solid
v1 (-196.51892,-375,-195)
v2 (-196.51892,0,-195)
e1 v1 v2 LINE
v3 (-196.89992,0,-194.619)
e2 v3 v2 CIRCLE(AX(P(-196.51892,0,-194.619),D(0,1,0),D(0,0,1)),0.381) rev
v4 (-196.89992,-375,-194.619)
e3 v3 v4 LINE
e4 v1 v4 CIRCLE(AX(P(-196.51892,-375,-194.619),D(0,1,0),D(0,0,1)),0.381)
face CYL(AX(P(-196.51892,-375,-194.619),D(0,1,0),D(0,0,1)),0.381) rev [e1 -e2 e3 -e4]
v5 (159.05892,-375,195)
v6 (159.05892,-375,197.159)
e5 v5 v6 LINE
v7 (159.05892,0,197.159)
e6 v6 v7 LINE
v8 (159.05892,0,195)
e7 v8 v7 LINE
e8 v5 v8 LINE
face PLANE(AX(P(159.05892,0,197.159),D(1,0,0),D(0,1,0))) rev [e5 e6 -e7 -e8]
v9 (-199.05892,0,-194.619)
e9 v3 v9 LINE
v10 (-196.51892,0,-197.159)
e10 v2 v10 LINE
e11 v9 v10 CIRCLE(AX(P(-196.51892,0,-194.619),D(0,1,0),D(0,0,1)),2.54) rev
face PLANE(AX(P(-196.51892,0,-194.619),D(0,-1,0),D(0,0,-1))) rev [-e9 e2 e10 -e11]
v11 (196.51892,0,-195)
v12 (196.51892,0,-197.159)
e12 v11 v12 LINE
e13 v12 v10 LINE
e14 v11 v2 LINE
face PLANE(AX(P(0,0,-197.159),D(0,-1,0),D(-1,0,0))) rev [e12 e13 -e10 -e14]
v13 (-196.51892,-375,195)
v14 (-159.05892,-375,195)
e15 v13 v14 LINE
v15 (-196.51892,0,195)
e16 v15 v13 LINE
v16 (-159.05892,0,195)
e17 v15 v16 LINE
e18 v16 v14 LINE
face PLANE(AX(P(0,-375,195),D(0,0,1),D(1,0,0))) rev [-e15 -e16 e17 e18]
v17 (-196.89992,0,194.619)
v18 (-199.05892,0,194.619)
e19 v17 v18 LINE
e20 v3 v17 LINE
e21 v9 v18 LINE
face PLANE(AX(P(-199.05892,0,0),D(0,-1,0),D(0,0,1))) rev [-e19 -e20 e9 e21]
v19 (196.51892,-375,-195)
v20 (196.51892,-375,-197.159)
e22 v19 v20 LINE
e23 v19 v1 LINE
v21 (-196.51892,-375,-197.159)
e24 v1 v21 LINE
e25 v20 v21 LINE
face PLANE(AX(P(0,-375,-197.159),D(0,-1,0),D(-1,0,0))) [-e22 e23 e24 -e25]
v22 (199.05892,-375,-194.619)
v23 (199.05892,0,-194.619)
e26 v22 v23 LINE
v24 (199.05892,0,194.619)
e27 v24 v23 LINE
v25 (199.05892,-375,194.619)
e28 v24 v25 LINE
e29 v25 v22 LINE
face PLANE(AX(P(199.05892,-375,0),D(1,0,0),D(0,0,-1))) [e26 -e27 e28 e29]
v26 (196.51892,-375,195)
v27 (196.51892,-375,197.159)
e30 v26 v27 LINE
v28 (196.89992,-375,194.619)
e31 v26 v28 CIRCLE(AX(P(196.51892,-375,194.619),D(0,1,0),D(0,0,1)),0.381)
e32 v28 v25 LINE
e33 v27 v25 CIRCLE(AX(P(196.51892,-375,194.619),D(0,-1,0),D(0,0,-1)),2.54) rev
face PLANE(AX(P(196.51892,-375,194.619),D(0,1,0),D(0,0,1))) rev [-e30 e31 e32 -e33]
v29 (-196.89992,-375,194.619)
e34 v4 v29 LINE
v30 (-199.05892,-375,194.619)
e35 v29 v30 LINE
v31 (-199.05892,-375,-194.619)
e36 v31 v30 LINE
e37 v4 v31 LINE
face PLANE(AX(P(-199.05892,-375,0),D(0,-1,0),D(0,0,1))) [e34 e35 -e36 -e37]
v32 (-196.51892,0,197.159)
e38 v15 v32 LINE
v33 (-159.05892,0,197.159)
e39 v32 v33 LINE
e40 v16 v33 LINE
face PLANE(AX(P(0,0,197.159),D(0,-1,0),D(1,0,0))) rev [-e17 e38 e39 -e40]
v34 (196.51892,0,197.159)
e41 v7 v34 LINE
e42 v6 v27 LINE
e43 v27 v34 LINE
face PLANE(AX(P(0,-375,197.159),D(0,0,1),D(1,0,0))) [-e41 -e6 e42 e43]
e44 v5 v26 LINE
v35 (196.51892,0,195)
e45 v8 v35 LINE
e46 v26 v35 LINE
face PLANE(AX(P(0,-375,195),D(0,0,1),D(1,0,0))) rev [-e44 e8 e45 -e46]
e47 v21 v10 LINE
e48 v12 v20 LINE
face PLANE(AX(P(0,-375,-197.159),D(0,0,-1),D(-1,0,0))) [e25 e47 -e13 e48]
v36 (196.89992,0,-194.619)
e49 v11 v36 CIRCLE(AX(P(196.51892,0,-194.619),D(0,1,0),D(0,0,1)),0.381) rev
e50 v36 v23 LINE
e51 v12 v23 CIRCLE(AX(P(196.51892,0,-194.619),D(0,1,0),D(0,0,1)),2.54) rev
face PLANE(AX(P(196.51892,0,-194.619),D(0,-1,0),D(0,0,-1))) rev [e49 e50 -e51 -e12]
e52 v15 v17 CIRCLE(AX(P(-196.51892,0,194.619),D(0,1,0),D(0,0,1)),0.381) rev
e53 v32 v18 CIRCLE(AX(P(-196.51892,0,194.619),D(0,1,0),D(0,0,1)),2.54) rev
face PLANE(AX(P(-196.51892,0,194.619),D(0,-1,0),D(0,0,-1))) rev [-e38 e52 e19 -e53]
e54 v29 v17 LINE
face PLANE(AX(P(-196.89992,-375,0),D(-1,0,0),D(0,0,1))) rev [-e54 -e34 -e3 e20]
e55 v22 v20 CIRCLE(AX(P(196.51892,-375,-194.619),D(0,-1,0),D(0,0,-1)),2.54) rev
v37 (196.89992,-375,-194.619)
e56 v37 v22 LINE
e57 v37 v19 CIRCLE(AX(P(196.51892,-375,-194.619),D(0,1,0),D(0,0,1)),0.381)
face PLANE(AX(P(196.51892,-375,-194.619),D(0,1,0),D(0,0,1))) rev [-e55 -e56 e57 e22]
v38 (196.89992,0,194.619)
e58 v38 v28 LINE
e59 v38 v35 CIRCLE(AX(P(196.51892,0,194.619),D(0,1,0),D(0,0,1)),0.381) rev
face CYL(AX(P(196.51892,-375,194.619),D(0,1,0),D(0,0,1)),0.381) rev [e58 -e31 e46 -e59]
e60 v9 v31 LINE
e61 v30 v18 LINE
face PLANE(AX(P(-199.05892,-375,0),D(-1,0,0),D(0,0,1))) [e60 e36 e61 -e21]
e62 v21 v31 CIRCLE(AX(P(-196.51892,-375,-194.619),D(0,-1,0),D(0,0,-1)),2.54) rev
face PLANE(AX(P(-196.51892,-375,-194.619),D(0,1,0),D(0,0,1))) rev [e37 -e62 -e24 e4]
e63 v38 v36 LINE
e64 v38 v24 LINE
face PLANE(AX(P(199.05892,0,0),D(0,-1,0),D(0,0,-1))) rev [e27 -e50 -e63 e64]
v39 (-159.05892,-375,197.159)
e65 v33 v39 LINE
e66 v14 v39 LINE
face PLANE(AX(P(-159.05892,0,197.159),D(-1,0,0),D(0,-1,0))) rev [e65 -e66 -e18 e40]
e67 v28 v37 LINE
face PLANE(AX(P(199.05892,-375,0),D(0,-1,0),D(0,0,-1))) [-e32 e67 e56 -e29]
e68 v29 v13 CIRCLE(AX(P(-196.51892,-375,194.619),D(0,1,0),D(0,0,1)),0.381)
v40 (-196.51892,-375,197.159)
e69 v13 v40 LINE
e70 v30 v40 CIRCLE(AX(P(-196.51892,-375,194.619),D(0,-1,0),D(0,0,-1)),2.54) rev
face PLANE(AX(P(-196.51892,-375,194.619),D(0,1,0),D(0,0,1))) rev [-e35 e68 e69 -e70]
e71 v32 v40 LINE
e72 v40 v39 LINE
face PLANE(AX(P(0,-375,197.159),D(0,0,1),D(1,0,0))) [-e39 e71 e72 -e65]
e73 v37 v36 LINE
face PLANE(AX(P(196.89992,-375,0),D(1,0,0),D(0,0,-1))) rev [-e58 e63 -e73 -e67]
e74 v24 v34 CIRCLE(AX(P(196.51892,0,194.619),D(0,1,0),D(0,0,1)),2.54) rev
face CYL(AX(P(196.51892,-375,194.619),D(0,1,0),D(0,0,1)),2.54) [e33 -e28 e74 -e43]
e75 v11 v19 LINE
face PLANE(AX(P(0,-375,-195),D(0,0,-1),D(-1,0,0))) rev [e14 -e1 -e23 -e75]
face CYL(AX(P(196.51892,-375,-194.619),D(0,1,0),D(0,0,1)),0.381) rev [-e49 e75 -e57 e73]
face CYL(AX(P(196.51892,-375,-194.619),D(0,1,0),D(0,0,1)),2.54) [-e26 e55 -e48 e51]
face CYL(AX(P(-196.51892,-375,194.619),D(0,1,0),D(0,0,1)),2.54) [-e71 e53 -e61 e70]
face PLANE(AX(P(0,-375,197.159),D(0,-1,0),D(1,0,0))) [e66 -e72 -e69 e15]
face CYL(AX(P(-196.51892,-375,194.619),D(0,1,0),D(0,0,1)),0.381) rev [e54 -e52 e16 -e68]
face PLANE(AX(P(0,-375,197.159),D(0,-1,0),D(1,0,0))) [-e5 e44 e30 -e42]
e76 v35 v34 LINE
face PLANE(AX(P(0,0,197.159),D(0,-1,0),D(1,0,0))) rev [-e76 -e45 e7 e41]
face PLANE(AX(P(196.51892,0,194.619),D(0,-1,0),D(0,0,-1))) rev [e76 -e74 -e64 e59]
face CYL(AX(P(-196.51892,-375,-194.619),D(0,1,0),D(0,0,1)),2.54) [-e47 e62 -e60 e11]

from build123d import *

# Parameters (mm, degrees)
SKETCH1_W              = 398.11784
SKETCH1_H              = 394.318
SKETCH1_W_2            = 393.79984
SKETCH1_H_2            = 390
EXTRUDE_THIN1_DEPTH    = 375
CUT_EXTRUDE1_REACH     = 581.427
SKETCH2_W              = 318.11784
SKETCH2_H              = 375
CONVERT_SOLID1_START   = -375
CONVERT_SOLID1_DEPTH   = 375
CONVERT_SOLID1_2_DEPTH = 375


# Read off the part's stored shape, not the designer's step: Convert-Solid1
with BuildPart() as part:
    # Sketch1 → Extrude-Thin1 (new body)
    with BuildSketch(Plane(origin=(0, 0, 0), x_dir=(1, 0, 0), z_dir=(0, 1, 0))):
        Rectangle(SKETCH1_W, SKETCH1_H)
        Rectangle(SKETCH1_W_2, SKETCH1_H_2, mode=Mode.SUBTRACT)
    extrude(amount=-EXTRUDE_THIN1_DEPTH)

    # Sketch2 → Cut-Extrude1 (cut, up to next)
    with BuildSketch(Plane.XY.offset(197.159), mode=Mode.PRIVATE) as cut_extrude1_sk1:
        with Locations((0, -187.5)):
            Rectangle(SKETCH2_W, SKETCH2_H)
    cut_extrude1_tool1 = extrude(cut_extrude1_sk1.sketch, amount=-CUT_EXTRUDE1_REACH, mode=Mode.PRIVATE) & part.part
    add(cut_extrude1_tool1.solids().sort_by_distance((0, -187.5, 197.159))[0], mode=Mode.SUBTRACT)

    # Convert-Solid1 outline → Convert-Solid1 (cut)
    with BuildSketch(Plane(origin=(0, 0, 0), x_dir=(1, 0, 0), z_dir=(0, 1, 0)).offset(CONVERT_SOLID1_START)):
        with BuildLine():
            Line((199.05892, -197.159), (199.05892, -194.619))
            ThreePointArc((199.05892, -194.619), (198.314971224, -196.415051224), (196.51892, -197.159))
            Line((196.51892, -197.159), (199.05892, -197.159))
        make_face()
        with BuildLine():
            Line((199.05892, 197.159), (196.51892, 197.159))
            ThreePointArc((196.51892, 197.159), (198.314971224, 196.415051224), (199.05892, 194.619))
            Line((199.05892, 194.619), (199.05892, 197.159))
        make_face()
        with BuildLine():
            Line((-199.05892, 197.159), (-199.05892, 194.619))
            ThreePointArc((-199.05892, 194.619), (-198.314971224, 196.415051224), (-196.51892, 197.159))
            Line((-196.51892, 197.159), (-199.05892, 197.159))
        make_face()
        with BuildLine():
            ThreePointArc((-196.51892, -197.159), (-198.314971224, -196.415051224), (-199.05892, -194.619))
            Line((-199.05892, -194.619), (-199.05892, -197.159))
            Line((-199.05892, -197.159), (-196.51892, -197.159))
        make_face()
    extrude(amount=CONVERT_SOLID1_DEPTH, mode=Mode.SUBTRACT)

    # Convert-Solid1 2 outline → Convert-Solid1 2 (add)
    with BuildSketch(Plane(origin=(0, 0, 0), x_dir=(1, 0, 0), z_dir=(0, 1, 0)).offset(CONVERT_SOLID1_START)):
        with BuildLine():
            Line((196.89992, -195), (196.89992, -194.619))
            ThreePointArc((196.89992, -194.619), (196.788327684, -194.888407684), (196.51892, -195))
            Line((196.51892, -195), (196.89992, -195))
        make_face()
        with BuildLine():
            Line((196.89992, 195), (196.51892, 195))
            ThreePointArc((196.51892, 195), (196.788327684, 194.888407684), (196.89992, 194.619))
            Line((196.89992, 194.619), (196.89992, 195))
        make_face()
        with BuildLine():
            Line((-196.89992, 195), (-196.89992, 194.619))
            ThreePointArc((-196.89992, 194.619), (-196.788327684, 194.888407684), (-196.51892, 195))
            Line((-196.51892, 195), (-196.89992, 195))
        make_face()
        with BuildLine():
            ThreePointArc((-196.51892, -195), (-196.788327684, -194.888407684), (-196.89992, -194.619))
            Line((-196.89992, -194.619), (-196.89992, -195))
            Line((-196.89992, -195), (-196.51892, -195))
        make_face()
    extrude(amount=CONVERT_SOLID1_2_DEPTH)


solid = part.part
